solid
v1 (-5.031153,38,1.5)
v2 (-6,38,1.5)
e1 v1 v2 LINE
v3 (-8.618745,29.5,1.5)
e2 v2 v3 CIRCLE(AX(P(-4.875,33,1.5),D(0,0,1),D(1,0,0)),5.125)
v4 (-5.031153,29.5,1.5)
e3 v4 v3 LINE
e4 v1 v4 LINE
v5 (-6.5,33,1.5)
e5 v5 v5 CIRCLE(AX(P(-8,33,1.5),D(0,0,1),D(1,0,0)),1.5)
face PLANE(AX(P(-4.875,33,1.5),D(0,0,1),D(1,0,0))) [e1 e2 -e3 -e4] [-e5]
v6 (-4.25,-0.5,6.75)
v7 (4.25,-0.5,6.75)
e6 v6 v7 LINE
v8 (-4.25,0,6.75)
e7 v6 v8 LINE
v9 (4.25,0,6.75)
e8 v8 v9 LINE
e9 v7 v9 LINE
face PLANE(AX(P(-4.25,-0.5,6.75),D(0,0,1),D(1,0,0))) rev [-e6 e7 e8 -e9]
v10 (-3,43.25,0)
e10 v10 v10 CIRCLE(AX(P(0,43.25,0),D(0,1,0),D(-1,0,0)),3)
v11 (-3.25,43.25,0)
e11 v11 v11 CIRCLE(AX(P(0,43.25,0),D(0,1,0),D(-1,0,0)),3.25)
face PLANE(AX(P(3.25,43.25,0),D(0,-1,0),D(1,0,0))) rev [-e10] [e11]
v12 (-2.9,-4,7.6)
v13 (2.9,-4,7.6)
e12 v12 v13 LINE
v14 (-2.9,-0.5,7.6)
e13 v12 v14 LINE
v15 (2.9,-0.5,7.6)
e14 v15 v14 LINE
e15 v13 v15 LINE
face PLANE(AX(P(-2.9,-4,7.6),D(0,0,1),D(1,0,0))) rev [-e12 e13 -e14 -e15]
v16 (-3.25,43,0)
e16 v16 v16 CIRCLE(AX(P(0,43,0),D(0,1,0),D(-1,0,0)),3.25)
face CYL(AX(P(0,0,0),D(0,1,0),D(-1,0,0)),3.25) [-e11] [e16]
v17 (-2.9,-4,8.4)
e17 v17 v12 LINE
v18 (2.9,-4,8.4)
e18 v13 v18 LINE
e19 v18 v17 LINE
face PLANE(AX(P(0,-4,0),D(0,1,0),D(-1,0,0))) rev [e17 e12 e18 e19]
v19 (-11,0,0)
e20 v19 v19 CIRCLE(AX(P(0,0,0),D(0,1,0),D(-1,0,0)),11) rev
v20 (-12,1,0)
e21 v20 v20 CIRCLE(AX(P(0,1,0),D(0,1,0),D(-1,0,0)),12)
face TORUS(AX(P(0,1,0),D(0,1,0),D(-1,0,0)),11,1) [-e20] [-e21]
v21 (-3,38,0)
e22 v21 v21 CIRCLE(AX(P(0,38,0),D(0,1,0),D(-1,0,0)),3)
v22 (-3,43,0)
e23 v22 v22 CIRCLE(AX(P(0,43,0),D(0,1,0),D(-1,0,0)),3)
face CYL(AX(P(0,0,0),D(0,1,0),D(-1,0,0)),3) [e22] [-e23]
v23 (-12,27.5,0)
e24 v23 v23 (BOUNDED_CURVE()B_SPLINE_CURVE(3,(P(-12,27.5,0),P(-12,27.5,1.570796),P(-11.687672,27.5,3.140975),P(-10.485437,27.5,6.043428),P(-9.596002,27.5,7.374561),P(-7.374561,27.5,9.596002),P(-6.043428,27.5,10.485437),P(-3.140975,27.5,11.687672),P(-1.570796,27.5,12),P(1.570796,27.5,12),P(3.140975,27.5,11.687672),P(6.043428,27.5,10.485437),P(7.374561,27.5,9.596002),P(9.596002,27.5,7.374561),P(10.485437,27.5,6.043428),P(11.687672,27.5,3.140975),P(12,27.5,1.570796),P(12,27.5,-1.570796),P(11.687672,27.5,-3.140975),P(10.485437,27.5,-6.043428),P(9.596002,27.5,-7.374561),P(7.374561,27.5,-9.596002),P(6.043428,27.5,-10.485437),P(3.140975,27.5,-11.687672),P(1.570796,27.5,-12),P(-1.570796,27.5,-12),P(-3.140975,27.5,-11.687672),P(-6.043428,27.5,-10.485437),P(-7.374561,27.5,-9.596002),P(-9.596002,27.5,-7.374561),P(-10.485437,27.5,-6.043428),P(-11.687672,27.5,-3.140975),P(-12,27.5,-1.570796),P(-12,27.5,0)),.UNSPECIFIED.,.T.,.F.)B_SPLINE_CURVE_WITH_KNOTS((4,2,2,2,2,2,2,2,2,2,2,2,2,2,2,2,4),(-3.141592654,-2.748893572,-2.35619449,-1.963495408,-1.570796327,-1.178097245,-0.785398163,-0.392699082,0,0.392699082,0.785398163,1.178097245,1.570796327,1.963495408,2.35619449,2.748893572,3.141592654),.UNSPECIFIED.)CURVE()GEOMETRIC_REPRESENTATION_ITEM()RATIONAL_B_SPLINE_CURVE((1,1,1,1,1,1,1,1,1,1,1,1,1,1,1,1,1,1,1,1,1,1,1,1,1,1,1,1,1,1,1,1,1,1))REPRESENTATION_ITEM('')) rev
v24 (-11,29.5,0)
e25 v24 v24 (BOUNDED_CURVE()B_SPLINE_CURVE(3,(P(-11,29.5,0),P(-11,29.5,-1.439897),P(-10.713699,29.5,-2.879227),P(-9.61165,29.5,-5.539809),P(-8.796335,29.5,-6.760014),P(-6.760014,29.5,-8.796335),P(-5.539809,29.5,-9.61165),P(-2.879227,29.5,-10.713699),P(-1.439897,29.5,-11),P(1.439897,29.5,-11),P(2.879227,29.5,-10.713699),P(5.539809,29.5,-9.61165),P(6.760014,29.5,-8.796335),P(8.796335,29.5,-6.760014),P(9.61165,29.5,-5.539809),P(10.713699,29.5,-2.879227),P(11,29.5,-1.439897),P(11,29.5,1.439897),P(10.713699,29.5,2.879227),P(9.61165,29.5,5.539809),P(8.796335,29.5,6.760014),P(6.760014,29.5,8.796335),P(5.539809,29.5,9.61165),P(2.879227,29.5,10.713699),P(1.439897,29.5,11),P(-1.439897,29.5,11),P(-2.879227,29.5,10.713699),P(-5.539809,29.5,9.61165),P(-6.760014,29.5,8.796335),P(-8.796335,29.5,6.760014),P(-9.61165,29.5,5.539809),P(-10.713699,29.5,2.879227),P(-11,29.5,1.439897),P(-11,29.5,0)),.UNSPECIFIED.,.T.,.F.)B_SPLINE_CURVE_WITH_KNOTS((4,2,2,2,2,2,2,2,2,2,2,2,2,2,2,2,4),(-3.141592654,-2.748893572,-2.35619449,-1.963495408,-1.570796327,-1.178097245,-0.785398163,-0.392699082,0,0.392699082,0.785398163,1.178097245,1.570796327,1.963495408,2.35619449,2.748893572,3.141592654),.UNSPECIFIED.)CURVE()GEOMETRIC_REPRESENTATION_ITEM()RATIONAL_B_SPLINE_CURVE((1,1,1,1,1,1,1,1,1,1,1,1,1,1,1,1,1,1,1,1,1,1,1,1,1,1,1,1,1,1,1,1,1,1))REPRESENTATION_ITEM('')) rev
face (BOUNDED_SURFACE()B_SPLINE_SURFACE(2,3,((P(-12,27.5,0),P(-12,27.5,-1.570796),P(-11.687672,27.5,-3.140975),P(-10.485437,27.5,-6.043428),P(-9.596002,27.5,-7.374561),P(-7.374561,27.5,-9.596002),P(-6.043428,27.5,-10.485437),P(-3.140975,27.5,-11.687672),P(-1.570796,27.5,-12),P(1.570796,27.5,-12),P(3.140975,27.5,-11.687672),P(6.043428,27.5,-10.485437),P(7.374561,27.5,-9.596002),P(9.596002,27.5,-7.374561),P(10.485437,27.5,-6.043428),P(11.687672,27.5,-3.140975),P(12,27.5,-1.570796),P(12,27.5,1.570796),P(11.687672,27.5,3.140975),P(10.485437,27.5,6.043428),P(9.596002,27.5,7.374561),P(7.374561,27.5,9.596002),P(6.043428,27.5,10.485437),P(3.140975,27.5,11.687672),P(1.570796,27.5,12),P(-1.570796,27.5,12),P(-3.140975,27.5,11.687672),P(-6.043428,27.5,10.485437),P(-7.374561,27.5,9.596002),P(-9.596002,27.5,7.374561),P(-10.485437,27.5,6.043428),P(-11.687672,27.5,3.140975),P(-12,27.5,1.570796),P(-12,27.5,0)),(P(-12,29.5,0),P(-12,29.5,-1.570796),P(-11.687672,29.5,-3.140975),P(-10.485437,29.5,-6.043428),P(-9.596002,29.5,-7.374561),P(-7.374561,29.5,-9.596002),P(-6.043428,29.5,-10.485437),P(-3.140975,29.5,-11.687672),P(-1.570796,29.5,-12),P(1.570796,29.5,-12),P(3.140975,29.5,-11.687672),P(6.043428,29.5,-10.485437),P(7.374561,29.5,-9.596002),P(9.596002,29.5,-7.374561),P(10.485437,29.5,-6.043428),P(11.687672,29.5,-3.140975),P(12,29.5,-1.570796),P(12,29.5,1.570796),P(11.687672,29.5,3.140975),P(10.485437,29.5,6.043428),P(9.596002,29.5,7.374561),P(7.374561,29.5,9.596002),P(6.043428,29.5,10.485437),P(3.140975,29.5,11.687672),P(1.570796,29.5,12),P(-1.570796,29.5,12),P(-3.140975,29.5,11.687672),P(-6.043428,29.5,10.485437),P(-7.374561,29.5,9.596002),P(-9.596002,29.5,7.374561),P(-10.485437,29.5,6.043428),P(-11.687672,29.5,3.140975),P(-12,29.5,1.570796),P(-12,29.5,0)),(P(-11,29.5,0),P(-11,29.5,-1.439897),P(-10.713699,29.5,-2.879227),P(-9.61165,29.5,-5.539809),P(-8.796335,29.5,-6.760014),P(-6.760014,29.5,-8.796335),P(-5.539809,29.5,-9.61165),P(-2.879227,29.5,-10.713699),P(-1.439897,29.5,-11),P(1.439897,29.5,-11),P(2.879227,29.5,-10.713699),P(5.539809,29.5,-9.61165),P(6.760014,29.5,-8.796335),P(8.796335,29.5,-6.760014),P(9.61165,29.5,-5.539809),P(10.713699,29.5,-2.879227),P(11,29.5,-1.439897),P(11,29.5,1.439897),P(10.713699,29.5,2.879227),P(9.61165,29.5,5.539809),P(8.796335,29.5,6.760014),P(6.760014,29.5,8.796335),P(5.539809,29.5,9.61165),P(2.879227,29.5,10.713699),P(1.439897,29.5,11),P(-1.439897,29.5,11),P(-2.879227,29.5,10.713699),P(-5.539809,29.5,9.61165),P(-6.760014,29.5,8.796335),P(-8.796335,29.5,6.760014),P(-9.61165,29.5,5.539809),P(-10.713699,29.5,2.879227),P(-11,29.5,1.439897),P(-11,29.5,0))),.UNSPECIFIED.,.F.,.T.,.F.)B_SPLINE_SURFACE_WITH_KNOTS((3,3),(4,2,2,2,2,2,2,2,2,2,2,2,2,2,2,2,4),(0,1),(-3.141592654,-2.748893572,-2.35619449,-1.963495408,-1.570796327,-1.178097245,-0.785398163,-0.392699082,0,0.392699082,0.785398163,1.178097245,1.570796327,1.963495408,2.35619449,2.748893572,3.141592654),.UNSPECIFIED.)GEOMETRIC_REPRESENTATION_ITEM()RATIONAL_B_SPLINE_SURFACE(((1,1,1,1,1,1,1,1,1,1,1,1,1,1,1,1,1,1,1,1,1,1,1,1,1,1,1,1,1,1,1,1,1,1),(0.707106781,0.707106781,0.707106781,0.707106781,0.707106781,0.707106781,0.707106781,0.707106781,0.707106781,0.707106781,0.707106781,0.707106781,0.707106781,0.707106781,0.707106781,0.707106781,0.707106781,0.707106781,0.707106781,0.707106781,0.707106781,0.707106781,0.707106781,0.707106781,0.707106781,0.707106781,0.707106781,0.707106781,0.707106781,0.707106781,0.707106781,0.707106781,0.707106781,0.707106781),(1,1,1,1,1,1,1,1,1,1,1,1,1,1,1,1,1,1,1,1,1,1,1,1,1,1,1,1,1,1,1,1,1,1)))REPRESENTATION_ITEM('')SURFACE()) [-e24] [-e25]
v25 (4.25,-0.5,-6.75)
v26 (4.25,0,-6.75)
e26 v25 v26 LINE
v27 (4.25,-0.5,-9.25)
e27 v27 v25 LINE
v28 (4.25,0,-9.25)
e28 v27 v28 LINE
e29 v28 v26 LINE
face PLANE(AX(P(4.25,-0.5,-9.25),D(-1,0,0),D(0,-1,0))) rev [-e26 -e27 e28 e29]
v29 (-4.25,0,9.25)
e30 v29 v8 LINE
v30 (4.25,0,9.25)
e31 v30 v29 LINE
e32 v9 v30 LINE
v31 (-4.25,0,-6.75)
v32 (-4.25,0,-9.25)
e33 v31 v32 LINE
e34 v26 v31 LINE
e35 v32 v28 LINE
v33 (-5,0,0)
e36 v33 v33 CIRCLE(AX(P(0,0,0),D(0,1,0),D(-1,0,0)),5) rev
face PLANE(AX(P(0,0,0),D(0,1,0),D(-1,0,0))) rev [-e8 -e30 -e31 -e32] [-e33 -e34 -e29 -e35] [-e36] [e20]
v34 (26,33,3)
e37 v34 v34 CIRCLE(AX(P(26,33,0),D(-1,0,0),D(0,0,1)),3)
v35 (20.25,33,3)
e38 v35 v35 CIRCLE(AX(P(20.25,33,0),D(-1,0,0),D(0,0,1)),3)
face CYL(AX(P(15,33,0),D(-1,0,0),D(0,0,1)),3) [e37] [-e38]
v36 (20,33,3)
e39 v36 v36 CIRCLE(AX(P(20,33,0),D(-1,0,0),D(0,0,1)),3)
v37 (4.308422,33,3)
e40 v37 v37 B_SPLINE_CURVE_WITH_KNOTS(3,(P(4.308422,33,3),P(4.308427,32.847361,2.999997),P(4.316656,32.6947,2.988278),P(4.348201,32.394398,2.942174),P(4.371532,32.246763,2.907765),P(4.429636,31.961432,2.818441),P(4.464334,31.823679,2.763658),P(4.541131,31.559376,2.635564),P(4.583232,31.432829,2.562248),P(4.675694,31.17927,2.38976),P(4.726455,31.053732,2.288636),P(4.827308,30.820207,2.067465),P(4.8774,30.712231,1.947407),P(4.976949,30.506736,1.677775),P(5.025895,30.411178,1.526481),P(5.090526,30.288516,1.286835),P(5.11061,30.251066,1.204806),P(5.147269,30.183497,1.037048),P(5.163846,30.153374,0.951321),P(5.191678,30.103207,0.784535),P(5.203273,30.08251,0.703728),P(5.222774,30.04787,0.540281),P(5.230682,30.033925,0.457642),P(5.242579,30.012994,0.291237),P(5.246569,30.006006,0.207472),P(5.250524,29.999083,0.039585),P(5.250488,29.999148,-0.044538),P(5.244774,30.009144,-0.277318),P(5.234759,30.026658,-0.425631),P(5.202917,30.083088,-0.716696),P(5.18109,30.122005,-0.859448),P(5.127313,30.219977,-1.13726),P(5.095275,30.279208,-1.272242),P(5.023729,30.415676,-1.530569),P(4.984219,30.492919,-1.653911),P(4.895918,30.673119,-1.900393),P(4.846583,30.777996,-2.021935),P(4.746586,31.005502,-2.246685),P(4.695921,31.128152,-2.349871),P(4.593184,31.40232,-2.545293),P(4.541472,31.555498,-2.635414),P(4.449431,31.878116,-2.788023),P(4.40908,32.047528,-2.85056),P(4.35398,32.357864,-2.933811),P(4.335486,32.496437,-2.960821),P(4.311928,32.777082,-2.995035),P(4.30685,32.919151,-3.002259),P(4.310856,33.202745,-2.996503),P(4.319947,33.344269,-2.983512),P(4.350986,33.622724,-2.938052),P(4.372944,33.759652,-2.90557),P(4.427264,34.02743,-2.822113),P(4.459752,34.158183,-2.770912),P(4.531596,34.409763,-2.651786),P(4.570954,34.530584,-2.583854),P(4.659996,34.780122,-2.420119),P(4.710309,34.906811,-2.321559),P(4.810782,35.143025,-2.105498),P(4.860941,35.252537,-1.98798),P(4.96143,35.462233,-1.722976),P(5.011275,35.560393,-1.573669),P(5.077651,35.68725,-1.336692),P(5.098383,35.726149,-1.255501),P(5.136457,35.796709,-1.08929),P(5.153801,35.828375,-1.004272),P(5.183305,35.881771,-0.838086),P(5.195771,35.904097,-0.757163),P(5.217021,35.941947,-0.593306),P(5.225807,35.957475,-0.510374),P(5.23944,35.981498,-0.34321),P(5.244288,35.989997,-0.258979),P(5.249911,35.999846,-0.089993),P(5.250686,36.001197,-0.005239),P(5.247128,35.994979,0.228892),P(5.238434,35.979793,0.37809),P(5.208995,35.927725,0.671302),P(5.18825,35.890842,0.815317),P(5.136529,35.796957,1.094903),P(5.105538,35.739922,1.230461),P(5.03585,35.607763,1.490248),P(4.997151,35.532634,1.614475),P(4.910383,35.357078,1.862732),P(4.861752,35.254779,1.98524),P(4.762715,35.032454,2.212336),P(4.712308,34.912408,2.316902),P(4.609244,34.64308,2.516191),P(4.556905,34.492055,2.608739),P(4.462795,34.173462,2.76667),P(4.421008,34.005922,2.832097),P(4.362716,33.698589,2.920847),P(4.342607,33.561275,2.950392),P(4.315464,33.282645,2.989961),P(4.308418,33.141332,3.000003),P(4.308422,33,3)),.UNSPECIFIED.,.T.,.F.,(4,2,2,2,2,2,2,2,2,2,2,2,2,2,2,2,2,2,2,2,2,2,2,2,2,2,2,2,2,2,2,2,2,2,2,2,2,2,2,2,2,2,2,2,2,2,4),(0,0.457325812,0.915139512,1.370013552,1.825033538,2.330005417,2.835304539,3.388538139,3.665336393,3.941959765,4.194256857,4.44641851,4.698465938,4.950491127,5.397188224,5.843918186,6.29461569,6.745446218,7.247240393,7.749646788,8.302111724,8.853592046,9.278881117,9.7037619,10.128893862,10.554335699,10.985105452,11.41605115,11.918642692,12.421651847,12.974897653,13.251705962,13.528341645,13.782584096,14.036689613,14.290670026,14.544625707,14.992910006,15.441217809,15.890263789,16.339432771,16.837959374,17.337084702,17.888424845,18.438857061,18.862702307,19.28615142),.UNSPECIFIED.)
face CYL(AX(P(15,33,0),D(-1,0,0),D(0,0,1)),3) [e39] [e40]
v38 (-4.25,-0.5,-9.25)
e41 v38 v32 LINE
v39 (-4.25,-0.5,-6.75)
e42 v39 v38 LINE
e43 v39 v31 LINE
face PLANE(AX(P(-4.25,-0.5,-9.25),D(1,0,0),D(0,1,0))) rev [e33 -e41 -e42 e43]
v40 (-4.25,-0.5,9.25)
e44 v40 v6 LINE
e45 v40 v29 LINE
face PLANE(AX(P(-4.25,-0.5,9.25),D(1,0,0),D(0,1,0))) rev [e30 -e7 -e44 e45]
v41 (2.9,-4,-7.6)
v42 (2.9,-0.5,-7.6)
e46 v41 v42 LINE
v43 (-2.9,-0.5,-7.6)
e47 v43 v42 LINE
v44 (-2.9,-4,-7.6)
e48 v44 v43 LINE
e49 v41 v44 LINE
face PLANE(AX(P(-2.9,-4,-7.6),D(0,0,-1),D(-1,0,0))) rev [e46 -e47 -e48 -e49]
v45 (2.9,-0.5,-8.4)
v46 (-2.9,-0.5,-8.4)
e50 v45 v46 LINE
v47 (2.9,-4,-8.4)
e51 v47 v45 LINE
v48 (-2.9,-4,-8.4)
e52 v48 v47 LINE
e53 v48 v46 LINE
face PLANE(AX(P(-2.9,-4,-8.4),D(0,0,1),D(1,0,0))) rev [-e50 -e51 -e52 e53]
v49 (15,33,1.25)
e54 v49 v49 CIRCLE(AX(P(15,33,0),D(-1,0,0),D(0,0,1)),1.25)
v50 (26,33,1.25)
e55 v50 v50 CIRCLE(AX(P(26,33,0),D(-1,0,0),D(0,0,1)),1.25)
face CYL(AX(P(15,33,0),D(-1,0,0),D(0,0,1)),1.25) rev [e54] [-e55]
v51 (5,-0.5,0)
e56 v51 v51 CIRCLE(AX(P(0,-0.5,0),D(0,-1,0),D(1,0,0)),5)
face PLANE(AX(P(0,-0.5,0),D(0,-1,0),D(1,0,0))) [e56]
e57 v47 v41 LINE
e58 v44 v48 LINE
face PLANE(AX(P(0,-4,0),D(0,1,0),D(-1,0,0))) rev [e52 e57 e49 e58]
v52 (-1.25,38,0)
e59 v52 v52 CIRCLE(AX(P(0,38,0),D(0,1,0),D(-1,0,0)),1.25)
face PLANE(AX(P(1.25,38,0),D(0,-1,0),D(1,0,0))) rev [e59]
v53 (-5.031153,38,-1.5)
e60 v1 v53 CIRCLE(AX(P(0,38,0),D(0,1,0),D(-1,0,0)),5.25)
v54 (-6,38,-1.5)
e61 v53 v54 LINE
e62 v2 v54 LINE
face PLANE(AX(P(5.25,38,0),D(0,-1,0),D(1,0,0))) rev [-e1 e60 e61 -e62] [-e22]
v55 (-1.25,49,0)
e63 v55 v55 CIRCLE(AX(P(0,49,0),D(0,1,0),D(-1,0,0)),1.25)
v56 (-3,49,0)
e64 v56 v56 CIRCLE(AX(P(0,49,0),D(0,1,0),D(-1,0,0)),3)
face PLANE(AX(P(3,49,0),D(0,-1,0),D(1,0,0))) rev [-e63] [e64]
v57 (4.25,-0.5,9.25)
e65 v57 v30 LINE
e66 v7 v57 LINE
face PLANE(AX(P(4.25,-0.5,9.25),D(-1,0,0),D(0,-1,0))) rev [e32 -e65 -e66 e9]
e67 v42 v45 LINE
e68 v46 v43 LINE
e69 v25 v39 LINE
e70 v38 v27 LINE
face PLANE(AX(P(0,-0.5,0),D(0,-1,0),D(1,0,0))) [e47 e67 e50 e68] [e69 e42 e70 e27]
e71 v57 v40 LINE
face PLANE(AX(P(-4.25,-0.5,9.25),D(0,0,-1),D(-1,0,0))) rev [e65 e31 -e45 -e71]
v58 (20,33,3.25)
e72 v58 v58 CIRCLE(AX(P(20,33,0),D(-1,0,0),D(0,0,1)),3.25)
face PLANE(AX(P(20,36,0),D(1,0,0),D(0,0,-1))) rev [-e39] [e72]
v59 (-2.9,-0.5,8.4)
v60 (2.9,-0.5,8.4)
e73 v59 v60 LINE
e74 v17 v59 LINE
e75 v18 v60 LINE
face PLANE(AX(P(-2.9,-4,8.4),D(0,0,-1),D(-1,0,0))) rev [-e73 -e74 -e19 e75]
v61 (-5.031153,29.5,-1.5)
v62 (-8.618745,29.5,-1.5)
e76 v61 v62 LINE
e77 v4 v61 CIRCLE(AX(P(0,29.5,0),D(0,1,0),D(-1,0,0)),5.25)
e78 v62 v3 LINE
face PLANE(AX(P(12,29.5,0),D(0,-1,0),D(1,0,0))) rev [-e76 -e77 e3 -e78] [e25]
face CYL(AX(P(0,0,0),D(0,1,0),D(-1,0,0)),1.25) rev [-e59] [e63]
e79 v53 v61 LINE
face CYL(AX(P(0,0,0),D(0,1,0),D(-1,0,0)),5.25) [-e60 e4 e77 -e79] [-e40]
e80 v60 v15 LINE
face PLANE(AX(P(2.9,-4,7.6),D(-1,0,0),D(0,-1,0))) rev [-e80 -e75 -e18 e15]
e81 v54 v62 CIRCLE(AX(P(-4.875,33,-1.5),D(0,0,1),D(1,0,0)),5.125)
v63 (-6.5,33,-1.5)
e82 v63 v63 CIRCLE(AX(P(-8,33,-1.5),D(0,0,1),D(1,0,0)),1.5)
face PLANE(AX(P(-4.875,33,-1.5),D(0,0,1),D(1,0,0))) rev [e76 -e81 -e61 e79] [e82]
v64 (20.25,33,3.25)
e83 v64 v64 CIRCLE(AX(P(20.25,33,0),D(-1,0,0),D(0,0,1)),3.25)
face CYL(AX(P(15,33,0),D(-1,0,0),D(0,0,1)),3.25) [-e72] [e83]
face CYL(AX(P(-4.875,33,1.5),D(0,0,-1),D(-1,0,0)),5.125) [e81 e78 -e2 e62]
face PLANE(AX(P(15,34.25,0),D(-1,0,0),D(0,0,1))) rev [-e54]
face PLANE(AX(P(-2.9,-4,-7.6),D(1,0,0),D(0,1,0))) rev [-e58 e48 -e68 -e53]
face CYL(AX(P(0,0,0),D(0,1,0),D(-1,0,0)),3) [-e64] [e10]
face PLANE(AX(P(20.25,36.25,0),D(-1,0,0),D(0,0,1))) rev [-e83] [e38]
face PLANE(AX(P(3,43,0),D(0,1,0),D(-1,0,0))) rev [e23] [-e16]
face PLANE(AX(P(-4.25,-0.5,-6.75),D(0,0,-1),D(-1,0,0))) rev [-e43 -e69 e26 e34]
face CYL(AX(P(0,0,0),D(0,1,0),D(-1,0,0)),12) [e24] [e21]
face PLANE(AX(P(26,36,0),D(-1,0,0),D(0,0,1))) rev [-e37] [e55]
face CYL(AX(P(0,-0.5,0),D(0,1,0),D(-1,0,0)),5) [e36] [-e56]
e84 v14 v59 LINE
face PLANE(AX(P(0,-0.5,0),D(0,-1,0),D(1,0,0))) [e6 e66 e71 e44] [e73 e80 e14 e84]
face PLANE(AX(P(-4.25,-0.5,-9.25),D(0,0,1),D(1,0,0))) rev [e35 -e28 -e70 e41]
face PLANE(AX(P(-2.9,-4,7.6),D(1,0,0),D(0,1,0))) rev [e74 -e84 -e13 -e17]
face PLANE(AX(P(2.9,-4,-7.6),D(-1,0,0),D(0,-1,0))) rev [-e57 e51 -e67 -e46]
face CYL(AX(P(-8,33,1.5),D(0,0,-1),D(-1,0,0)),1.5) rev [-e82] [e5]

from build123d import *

# Parameters (mm, degrees)
ESQUISSE2_R        = 1.5
BOSS_EXTRU_1_DEPTH = 1.5
ESQUISSE4_R        = 5
ESQUISSE4_W        = 8.5
ESQUISSE4_H        = 2.5
BOSS_EXTRU_2_DEPTH = 0.5
ESQUISSE5_W        = 5.8
ESQUISSE5_H        = 0.8
BOSS_EXTRU_3_DEPTH = 4
CONG_2_SIZE        = 2
CONG_2_SIZE_2      = 1
CONG_3_R           = 1


with BuildPart() as part:
    # Esquisse1 → Révolution1 (revolve)
    with BuildSketch(Plane.XY, mode=Mode.PRIVATE) as r_volution1_sk:
        Polygon((0, 0), (12, 0), (12, 29.5), (5.25, 29.5), (5.25, 38), (3, 38), (3, 43), (3.25, 43), (3.25, 43.25), (3, 43.25), (3, 49), (1.25, 49), (1.25, 38), (0, 38), align=None)
    revolve(r_volution1_sk.sketch.rotate(Axis((0, 0, 0), (0, -1, 0)), 180), axis=Axis((0, 0, 0), (0, -1, 0)))

    # Esquisse2 → Boss.-Extru.1 (add, symmetric)
    with BuildSketch(Plane.XY):
        with BuildLine():
            Line((0, 38), (-6, 38))
            ThreePointArc((-6, 38), (-10, 33), (-6, 28))
            Line((-6, 28), (0, 28))
            Line((0, 28), (0, 38))
        make_face()
        with Locations((-8, 33)):
            Circle(ESQUISSE2_R, mode=Mode.SUBTRACT)
    extrude(amount=BOSS_EXTRU_1_DEPTH, both=True)

    # Esquisse3 → Révolution3 (revolve)
    with BuildSketch(Plane.XY, mode=Mode.PRIVATE) as r_volution3_sk:
        Polygon((0, 36), (20, 36), (20, 36.25), (20.25, 36.25), (20.25, 36), (26, 36), (26, 34.25), (15, 34.25), (15, 33), (0, 33), align=None)
    revolve(r_volution3_sk.sketch.rotate(Axis((15, 33, 0), (1, 0, 0)), 90), axis=Axis((15, 33, 0), (1, 0, 0)))

    # Esquisse4 → Boss.-Extru.2 (add)
    with BuildSketch(Plane.XZ):
        with Locations(Location((0, 0, 0), (0, 0, 180))):
            Circle(ESQUISSE4_R)
        with Locations((0, 8)):
            Rectangle(ESQUISSE4_W, ESQUISSE4_H)
        with Locations((0, -8)):
            Rectangle(ESQUISSE4_W, ESQUISSE4_H)
    extrude(amount=BOSS_EXTRU_2_DEPTH)

    # Esquisse5 → Boss.-Extru.3 (add)
    with BuildSketch(Plane.XZ):
        with Locations((0, 8)):
            Rectangle(ESQUISSE5_W, ESQUISSE5_H)
        with Locations((0, -8)):
            Rectangle(ESQUISSE5_W, ESQUISSE5_H)
    extrude(amount=BOSS_EXTRU_3_DEPTH)

    # Congé2
    # an asymmetric fillet: 2, 1 mm, written as the material it takes off along each edge
    with BuildSketch(Plane(origin=(0, 29.5, 0), x_dir=(-1, 0, 0), z_dir=(0, 0, 1))) as cong_2_piece_1:
        with BuildLine():
            Bezier((12, CONG_2_SIZE), (12, 0), (12 - CONG_2_SIZE_2, 0), weights=[1, 0.707106781, 1])
            Line((12 - CONG_2_SIZE_2, 0), (12, 0))
            Line((12, 0), (12, CONG_2_SIZE))
        make_face()
    revolve(axis=Axis((0, 29.5, 0), (0, -1, 0)), mode=Mode.SUBTRACT)

    # Congé3
    cong_3_edges = [part.edges().sort_by_distance(p)[0] for p in [
        (12, 0, 0),
    ]]
    fillet(cong_3_edges, radius=CONG_3_R)


solid = part.part
